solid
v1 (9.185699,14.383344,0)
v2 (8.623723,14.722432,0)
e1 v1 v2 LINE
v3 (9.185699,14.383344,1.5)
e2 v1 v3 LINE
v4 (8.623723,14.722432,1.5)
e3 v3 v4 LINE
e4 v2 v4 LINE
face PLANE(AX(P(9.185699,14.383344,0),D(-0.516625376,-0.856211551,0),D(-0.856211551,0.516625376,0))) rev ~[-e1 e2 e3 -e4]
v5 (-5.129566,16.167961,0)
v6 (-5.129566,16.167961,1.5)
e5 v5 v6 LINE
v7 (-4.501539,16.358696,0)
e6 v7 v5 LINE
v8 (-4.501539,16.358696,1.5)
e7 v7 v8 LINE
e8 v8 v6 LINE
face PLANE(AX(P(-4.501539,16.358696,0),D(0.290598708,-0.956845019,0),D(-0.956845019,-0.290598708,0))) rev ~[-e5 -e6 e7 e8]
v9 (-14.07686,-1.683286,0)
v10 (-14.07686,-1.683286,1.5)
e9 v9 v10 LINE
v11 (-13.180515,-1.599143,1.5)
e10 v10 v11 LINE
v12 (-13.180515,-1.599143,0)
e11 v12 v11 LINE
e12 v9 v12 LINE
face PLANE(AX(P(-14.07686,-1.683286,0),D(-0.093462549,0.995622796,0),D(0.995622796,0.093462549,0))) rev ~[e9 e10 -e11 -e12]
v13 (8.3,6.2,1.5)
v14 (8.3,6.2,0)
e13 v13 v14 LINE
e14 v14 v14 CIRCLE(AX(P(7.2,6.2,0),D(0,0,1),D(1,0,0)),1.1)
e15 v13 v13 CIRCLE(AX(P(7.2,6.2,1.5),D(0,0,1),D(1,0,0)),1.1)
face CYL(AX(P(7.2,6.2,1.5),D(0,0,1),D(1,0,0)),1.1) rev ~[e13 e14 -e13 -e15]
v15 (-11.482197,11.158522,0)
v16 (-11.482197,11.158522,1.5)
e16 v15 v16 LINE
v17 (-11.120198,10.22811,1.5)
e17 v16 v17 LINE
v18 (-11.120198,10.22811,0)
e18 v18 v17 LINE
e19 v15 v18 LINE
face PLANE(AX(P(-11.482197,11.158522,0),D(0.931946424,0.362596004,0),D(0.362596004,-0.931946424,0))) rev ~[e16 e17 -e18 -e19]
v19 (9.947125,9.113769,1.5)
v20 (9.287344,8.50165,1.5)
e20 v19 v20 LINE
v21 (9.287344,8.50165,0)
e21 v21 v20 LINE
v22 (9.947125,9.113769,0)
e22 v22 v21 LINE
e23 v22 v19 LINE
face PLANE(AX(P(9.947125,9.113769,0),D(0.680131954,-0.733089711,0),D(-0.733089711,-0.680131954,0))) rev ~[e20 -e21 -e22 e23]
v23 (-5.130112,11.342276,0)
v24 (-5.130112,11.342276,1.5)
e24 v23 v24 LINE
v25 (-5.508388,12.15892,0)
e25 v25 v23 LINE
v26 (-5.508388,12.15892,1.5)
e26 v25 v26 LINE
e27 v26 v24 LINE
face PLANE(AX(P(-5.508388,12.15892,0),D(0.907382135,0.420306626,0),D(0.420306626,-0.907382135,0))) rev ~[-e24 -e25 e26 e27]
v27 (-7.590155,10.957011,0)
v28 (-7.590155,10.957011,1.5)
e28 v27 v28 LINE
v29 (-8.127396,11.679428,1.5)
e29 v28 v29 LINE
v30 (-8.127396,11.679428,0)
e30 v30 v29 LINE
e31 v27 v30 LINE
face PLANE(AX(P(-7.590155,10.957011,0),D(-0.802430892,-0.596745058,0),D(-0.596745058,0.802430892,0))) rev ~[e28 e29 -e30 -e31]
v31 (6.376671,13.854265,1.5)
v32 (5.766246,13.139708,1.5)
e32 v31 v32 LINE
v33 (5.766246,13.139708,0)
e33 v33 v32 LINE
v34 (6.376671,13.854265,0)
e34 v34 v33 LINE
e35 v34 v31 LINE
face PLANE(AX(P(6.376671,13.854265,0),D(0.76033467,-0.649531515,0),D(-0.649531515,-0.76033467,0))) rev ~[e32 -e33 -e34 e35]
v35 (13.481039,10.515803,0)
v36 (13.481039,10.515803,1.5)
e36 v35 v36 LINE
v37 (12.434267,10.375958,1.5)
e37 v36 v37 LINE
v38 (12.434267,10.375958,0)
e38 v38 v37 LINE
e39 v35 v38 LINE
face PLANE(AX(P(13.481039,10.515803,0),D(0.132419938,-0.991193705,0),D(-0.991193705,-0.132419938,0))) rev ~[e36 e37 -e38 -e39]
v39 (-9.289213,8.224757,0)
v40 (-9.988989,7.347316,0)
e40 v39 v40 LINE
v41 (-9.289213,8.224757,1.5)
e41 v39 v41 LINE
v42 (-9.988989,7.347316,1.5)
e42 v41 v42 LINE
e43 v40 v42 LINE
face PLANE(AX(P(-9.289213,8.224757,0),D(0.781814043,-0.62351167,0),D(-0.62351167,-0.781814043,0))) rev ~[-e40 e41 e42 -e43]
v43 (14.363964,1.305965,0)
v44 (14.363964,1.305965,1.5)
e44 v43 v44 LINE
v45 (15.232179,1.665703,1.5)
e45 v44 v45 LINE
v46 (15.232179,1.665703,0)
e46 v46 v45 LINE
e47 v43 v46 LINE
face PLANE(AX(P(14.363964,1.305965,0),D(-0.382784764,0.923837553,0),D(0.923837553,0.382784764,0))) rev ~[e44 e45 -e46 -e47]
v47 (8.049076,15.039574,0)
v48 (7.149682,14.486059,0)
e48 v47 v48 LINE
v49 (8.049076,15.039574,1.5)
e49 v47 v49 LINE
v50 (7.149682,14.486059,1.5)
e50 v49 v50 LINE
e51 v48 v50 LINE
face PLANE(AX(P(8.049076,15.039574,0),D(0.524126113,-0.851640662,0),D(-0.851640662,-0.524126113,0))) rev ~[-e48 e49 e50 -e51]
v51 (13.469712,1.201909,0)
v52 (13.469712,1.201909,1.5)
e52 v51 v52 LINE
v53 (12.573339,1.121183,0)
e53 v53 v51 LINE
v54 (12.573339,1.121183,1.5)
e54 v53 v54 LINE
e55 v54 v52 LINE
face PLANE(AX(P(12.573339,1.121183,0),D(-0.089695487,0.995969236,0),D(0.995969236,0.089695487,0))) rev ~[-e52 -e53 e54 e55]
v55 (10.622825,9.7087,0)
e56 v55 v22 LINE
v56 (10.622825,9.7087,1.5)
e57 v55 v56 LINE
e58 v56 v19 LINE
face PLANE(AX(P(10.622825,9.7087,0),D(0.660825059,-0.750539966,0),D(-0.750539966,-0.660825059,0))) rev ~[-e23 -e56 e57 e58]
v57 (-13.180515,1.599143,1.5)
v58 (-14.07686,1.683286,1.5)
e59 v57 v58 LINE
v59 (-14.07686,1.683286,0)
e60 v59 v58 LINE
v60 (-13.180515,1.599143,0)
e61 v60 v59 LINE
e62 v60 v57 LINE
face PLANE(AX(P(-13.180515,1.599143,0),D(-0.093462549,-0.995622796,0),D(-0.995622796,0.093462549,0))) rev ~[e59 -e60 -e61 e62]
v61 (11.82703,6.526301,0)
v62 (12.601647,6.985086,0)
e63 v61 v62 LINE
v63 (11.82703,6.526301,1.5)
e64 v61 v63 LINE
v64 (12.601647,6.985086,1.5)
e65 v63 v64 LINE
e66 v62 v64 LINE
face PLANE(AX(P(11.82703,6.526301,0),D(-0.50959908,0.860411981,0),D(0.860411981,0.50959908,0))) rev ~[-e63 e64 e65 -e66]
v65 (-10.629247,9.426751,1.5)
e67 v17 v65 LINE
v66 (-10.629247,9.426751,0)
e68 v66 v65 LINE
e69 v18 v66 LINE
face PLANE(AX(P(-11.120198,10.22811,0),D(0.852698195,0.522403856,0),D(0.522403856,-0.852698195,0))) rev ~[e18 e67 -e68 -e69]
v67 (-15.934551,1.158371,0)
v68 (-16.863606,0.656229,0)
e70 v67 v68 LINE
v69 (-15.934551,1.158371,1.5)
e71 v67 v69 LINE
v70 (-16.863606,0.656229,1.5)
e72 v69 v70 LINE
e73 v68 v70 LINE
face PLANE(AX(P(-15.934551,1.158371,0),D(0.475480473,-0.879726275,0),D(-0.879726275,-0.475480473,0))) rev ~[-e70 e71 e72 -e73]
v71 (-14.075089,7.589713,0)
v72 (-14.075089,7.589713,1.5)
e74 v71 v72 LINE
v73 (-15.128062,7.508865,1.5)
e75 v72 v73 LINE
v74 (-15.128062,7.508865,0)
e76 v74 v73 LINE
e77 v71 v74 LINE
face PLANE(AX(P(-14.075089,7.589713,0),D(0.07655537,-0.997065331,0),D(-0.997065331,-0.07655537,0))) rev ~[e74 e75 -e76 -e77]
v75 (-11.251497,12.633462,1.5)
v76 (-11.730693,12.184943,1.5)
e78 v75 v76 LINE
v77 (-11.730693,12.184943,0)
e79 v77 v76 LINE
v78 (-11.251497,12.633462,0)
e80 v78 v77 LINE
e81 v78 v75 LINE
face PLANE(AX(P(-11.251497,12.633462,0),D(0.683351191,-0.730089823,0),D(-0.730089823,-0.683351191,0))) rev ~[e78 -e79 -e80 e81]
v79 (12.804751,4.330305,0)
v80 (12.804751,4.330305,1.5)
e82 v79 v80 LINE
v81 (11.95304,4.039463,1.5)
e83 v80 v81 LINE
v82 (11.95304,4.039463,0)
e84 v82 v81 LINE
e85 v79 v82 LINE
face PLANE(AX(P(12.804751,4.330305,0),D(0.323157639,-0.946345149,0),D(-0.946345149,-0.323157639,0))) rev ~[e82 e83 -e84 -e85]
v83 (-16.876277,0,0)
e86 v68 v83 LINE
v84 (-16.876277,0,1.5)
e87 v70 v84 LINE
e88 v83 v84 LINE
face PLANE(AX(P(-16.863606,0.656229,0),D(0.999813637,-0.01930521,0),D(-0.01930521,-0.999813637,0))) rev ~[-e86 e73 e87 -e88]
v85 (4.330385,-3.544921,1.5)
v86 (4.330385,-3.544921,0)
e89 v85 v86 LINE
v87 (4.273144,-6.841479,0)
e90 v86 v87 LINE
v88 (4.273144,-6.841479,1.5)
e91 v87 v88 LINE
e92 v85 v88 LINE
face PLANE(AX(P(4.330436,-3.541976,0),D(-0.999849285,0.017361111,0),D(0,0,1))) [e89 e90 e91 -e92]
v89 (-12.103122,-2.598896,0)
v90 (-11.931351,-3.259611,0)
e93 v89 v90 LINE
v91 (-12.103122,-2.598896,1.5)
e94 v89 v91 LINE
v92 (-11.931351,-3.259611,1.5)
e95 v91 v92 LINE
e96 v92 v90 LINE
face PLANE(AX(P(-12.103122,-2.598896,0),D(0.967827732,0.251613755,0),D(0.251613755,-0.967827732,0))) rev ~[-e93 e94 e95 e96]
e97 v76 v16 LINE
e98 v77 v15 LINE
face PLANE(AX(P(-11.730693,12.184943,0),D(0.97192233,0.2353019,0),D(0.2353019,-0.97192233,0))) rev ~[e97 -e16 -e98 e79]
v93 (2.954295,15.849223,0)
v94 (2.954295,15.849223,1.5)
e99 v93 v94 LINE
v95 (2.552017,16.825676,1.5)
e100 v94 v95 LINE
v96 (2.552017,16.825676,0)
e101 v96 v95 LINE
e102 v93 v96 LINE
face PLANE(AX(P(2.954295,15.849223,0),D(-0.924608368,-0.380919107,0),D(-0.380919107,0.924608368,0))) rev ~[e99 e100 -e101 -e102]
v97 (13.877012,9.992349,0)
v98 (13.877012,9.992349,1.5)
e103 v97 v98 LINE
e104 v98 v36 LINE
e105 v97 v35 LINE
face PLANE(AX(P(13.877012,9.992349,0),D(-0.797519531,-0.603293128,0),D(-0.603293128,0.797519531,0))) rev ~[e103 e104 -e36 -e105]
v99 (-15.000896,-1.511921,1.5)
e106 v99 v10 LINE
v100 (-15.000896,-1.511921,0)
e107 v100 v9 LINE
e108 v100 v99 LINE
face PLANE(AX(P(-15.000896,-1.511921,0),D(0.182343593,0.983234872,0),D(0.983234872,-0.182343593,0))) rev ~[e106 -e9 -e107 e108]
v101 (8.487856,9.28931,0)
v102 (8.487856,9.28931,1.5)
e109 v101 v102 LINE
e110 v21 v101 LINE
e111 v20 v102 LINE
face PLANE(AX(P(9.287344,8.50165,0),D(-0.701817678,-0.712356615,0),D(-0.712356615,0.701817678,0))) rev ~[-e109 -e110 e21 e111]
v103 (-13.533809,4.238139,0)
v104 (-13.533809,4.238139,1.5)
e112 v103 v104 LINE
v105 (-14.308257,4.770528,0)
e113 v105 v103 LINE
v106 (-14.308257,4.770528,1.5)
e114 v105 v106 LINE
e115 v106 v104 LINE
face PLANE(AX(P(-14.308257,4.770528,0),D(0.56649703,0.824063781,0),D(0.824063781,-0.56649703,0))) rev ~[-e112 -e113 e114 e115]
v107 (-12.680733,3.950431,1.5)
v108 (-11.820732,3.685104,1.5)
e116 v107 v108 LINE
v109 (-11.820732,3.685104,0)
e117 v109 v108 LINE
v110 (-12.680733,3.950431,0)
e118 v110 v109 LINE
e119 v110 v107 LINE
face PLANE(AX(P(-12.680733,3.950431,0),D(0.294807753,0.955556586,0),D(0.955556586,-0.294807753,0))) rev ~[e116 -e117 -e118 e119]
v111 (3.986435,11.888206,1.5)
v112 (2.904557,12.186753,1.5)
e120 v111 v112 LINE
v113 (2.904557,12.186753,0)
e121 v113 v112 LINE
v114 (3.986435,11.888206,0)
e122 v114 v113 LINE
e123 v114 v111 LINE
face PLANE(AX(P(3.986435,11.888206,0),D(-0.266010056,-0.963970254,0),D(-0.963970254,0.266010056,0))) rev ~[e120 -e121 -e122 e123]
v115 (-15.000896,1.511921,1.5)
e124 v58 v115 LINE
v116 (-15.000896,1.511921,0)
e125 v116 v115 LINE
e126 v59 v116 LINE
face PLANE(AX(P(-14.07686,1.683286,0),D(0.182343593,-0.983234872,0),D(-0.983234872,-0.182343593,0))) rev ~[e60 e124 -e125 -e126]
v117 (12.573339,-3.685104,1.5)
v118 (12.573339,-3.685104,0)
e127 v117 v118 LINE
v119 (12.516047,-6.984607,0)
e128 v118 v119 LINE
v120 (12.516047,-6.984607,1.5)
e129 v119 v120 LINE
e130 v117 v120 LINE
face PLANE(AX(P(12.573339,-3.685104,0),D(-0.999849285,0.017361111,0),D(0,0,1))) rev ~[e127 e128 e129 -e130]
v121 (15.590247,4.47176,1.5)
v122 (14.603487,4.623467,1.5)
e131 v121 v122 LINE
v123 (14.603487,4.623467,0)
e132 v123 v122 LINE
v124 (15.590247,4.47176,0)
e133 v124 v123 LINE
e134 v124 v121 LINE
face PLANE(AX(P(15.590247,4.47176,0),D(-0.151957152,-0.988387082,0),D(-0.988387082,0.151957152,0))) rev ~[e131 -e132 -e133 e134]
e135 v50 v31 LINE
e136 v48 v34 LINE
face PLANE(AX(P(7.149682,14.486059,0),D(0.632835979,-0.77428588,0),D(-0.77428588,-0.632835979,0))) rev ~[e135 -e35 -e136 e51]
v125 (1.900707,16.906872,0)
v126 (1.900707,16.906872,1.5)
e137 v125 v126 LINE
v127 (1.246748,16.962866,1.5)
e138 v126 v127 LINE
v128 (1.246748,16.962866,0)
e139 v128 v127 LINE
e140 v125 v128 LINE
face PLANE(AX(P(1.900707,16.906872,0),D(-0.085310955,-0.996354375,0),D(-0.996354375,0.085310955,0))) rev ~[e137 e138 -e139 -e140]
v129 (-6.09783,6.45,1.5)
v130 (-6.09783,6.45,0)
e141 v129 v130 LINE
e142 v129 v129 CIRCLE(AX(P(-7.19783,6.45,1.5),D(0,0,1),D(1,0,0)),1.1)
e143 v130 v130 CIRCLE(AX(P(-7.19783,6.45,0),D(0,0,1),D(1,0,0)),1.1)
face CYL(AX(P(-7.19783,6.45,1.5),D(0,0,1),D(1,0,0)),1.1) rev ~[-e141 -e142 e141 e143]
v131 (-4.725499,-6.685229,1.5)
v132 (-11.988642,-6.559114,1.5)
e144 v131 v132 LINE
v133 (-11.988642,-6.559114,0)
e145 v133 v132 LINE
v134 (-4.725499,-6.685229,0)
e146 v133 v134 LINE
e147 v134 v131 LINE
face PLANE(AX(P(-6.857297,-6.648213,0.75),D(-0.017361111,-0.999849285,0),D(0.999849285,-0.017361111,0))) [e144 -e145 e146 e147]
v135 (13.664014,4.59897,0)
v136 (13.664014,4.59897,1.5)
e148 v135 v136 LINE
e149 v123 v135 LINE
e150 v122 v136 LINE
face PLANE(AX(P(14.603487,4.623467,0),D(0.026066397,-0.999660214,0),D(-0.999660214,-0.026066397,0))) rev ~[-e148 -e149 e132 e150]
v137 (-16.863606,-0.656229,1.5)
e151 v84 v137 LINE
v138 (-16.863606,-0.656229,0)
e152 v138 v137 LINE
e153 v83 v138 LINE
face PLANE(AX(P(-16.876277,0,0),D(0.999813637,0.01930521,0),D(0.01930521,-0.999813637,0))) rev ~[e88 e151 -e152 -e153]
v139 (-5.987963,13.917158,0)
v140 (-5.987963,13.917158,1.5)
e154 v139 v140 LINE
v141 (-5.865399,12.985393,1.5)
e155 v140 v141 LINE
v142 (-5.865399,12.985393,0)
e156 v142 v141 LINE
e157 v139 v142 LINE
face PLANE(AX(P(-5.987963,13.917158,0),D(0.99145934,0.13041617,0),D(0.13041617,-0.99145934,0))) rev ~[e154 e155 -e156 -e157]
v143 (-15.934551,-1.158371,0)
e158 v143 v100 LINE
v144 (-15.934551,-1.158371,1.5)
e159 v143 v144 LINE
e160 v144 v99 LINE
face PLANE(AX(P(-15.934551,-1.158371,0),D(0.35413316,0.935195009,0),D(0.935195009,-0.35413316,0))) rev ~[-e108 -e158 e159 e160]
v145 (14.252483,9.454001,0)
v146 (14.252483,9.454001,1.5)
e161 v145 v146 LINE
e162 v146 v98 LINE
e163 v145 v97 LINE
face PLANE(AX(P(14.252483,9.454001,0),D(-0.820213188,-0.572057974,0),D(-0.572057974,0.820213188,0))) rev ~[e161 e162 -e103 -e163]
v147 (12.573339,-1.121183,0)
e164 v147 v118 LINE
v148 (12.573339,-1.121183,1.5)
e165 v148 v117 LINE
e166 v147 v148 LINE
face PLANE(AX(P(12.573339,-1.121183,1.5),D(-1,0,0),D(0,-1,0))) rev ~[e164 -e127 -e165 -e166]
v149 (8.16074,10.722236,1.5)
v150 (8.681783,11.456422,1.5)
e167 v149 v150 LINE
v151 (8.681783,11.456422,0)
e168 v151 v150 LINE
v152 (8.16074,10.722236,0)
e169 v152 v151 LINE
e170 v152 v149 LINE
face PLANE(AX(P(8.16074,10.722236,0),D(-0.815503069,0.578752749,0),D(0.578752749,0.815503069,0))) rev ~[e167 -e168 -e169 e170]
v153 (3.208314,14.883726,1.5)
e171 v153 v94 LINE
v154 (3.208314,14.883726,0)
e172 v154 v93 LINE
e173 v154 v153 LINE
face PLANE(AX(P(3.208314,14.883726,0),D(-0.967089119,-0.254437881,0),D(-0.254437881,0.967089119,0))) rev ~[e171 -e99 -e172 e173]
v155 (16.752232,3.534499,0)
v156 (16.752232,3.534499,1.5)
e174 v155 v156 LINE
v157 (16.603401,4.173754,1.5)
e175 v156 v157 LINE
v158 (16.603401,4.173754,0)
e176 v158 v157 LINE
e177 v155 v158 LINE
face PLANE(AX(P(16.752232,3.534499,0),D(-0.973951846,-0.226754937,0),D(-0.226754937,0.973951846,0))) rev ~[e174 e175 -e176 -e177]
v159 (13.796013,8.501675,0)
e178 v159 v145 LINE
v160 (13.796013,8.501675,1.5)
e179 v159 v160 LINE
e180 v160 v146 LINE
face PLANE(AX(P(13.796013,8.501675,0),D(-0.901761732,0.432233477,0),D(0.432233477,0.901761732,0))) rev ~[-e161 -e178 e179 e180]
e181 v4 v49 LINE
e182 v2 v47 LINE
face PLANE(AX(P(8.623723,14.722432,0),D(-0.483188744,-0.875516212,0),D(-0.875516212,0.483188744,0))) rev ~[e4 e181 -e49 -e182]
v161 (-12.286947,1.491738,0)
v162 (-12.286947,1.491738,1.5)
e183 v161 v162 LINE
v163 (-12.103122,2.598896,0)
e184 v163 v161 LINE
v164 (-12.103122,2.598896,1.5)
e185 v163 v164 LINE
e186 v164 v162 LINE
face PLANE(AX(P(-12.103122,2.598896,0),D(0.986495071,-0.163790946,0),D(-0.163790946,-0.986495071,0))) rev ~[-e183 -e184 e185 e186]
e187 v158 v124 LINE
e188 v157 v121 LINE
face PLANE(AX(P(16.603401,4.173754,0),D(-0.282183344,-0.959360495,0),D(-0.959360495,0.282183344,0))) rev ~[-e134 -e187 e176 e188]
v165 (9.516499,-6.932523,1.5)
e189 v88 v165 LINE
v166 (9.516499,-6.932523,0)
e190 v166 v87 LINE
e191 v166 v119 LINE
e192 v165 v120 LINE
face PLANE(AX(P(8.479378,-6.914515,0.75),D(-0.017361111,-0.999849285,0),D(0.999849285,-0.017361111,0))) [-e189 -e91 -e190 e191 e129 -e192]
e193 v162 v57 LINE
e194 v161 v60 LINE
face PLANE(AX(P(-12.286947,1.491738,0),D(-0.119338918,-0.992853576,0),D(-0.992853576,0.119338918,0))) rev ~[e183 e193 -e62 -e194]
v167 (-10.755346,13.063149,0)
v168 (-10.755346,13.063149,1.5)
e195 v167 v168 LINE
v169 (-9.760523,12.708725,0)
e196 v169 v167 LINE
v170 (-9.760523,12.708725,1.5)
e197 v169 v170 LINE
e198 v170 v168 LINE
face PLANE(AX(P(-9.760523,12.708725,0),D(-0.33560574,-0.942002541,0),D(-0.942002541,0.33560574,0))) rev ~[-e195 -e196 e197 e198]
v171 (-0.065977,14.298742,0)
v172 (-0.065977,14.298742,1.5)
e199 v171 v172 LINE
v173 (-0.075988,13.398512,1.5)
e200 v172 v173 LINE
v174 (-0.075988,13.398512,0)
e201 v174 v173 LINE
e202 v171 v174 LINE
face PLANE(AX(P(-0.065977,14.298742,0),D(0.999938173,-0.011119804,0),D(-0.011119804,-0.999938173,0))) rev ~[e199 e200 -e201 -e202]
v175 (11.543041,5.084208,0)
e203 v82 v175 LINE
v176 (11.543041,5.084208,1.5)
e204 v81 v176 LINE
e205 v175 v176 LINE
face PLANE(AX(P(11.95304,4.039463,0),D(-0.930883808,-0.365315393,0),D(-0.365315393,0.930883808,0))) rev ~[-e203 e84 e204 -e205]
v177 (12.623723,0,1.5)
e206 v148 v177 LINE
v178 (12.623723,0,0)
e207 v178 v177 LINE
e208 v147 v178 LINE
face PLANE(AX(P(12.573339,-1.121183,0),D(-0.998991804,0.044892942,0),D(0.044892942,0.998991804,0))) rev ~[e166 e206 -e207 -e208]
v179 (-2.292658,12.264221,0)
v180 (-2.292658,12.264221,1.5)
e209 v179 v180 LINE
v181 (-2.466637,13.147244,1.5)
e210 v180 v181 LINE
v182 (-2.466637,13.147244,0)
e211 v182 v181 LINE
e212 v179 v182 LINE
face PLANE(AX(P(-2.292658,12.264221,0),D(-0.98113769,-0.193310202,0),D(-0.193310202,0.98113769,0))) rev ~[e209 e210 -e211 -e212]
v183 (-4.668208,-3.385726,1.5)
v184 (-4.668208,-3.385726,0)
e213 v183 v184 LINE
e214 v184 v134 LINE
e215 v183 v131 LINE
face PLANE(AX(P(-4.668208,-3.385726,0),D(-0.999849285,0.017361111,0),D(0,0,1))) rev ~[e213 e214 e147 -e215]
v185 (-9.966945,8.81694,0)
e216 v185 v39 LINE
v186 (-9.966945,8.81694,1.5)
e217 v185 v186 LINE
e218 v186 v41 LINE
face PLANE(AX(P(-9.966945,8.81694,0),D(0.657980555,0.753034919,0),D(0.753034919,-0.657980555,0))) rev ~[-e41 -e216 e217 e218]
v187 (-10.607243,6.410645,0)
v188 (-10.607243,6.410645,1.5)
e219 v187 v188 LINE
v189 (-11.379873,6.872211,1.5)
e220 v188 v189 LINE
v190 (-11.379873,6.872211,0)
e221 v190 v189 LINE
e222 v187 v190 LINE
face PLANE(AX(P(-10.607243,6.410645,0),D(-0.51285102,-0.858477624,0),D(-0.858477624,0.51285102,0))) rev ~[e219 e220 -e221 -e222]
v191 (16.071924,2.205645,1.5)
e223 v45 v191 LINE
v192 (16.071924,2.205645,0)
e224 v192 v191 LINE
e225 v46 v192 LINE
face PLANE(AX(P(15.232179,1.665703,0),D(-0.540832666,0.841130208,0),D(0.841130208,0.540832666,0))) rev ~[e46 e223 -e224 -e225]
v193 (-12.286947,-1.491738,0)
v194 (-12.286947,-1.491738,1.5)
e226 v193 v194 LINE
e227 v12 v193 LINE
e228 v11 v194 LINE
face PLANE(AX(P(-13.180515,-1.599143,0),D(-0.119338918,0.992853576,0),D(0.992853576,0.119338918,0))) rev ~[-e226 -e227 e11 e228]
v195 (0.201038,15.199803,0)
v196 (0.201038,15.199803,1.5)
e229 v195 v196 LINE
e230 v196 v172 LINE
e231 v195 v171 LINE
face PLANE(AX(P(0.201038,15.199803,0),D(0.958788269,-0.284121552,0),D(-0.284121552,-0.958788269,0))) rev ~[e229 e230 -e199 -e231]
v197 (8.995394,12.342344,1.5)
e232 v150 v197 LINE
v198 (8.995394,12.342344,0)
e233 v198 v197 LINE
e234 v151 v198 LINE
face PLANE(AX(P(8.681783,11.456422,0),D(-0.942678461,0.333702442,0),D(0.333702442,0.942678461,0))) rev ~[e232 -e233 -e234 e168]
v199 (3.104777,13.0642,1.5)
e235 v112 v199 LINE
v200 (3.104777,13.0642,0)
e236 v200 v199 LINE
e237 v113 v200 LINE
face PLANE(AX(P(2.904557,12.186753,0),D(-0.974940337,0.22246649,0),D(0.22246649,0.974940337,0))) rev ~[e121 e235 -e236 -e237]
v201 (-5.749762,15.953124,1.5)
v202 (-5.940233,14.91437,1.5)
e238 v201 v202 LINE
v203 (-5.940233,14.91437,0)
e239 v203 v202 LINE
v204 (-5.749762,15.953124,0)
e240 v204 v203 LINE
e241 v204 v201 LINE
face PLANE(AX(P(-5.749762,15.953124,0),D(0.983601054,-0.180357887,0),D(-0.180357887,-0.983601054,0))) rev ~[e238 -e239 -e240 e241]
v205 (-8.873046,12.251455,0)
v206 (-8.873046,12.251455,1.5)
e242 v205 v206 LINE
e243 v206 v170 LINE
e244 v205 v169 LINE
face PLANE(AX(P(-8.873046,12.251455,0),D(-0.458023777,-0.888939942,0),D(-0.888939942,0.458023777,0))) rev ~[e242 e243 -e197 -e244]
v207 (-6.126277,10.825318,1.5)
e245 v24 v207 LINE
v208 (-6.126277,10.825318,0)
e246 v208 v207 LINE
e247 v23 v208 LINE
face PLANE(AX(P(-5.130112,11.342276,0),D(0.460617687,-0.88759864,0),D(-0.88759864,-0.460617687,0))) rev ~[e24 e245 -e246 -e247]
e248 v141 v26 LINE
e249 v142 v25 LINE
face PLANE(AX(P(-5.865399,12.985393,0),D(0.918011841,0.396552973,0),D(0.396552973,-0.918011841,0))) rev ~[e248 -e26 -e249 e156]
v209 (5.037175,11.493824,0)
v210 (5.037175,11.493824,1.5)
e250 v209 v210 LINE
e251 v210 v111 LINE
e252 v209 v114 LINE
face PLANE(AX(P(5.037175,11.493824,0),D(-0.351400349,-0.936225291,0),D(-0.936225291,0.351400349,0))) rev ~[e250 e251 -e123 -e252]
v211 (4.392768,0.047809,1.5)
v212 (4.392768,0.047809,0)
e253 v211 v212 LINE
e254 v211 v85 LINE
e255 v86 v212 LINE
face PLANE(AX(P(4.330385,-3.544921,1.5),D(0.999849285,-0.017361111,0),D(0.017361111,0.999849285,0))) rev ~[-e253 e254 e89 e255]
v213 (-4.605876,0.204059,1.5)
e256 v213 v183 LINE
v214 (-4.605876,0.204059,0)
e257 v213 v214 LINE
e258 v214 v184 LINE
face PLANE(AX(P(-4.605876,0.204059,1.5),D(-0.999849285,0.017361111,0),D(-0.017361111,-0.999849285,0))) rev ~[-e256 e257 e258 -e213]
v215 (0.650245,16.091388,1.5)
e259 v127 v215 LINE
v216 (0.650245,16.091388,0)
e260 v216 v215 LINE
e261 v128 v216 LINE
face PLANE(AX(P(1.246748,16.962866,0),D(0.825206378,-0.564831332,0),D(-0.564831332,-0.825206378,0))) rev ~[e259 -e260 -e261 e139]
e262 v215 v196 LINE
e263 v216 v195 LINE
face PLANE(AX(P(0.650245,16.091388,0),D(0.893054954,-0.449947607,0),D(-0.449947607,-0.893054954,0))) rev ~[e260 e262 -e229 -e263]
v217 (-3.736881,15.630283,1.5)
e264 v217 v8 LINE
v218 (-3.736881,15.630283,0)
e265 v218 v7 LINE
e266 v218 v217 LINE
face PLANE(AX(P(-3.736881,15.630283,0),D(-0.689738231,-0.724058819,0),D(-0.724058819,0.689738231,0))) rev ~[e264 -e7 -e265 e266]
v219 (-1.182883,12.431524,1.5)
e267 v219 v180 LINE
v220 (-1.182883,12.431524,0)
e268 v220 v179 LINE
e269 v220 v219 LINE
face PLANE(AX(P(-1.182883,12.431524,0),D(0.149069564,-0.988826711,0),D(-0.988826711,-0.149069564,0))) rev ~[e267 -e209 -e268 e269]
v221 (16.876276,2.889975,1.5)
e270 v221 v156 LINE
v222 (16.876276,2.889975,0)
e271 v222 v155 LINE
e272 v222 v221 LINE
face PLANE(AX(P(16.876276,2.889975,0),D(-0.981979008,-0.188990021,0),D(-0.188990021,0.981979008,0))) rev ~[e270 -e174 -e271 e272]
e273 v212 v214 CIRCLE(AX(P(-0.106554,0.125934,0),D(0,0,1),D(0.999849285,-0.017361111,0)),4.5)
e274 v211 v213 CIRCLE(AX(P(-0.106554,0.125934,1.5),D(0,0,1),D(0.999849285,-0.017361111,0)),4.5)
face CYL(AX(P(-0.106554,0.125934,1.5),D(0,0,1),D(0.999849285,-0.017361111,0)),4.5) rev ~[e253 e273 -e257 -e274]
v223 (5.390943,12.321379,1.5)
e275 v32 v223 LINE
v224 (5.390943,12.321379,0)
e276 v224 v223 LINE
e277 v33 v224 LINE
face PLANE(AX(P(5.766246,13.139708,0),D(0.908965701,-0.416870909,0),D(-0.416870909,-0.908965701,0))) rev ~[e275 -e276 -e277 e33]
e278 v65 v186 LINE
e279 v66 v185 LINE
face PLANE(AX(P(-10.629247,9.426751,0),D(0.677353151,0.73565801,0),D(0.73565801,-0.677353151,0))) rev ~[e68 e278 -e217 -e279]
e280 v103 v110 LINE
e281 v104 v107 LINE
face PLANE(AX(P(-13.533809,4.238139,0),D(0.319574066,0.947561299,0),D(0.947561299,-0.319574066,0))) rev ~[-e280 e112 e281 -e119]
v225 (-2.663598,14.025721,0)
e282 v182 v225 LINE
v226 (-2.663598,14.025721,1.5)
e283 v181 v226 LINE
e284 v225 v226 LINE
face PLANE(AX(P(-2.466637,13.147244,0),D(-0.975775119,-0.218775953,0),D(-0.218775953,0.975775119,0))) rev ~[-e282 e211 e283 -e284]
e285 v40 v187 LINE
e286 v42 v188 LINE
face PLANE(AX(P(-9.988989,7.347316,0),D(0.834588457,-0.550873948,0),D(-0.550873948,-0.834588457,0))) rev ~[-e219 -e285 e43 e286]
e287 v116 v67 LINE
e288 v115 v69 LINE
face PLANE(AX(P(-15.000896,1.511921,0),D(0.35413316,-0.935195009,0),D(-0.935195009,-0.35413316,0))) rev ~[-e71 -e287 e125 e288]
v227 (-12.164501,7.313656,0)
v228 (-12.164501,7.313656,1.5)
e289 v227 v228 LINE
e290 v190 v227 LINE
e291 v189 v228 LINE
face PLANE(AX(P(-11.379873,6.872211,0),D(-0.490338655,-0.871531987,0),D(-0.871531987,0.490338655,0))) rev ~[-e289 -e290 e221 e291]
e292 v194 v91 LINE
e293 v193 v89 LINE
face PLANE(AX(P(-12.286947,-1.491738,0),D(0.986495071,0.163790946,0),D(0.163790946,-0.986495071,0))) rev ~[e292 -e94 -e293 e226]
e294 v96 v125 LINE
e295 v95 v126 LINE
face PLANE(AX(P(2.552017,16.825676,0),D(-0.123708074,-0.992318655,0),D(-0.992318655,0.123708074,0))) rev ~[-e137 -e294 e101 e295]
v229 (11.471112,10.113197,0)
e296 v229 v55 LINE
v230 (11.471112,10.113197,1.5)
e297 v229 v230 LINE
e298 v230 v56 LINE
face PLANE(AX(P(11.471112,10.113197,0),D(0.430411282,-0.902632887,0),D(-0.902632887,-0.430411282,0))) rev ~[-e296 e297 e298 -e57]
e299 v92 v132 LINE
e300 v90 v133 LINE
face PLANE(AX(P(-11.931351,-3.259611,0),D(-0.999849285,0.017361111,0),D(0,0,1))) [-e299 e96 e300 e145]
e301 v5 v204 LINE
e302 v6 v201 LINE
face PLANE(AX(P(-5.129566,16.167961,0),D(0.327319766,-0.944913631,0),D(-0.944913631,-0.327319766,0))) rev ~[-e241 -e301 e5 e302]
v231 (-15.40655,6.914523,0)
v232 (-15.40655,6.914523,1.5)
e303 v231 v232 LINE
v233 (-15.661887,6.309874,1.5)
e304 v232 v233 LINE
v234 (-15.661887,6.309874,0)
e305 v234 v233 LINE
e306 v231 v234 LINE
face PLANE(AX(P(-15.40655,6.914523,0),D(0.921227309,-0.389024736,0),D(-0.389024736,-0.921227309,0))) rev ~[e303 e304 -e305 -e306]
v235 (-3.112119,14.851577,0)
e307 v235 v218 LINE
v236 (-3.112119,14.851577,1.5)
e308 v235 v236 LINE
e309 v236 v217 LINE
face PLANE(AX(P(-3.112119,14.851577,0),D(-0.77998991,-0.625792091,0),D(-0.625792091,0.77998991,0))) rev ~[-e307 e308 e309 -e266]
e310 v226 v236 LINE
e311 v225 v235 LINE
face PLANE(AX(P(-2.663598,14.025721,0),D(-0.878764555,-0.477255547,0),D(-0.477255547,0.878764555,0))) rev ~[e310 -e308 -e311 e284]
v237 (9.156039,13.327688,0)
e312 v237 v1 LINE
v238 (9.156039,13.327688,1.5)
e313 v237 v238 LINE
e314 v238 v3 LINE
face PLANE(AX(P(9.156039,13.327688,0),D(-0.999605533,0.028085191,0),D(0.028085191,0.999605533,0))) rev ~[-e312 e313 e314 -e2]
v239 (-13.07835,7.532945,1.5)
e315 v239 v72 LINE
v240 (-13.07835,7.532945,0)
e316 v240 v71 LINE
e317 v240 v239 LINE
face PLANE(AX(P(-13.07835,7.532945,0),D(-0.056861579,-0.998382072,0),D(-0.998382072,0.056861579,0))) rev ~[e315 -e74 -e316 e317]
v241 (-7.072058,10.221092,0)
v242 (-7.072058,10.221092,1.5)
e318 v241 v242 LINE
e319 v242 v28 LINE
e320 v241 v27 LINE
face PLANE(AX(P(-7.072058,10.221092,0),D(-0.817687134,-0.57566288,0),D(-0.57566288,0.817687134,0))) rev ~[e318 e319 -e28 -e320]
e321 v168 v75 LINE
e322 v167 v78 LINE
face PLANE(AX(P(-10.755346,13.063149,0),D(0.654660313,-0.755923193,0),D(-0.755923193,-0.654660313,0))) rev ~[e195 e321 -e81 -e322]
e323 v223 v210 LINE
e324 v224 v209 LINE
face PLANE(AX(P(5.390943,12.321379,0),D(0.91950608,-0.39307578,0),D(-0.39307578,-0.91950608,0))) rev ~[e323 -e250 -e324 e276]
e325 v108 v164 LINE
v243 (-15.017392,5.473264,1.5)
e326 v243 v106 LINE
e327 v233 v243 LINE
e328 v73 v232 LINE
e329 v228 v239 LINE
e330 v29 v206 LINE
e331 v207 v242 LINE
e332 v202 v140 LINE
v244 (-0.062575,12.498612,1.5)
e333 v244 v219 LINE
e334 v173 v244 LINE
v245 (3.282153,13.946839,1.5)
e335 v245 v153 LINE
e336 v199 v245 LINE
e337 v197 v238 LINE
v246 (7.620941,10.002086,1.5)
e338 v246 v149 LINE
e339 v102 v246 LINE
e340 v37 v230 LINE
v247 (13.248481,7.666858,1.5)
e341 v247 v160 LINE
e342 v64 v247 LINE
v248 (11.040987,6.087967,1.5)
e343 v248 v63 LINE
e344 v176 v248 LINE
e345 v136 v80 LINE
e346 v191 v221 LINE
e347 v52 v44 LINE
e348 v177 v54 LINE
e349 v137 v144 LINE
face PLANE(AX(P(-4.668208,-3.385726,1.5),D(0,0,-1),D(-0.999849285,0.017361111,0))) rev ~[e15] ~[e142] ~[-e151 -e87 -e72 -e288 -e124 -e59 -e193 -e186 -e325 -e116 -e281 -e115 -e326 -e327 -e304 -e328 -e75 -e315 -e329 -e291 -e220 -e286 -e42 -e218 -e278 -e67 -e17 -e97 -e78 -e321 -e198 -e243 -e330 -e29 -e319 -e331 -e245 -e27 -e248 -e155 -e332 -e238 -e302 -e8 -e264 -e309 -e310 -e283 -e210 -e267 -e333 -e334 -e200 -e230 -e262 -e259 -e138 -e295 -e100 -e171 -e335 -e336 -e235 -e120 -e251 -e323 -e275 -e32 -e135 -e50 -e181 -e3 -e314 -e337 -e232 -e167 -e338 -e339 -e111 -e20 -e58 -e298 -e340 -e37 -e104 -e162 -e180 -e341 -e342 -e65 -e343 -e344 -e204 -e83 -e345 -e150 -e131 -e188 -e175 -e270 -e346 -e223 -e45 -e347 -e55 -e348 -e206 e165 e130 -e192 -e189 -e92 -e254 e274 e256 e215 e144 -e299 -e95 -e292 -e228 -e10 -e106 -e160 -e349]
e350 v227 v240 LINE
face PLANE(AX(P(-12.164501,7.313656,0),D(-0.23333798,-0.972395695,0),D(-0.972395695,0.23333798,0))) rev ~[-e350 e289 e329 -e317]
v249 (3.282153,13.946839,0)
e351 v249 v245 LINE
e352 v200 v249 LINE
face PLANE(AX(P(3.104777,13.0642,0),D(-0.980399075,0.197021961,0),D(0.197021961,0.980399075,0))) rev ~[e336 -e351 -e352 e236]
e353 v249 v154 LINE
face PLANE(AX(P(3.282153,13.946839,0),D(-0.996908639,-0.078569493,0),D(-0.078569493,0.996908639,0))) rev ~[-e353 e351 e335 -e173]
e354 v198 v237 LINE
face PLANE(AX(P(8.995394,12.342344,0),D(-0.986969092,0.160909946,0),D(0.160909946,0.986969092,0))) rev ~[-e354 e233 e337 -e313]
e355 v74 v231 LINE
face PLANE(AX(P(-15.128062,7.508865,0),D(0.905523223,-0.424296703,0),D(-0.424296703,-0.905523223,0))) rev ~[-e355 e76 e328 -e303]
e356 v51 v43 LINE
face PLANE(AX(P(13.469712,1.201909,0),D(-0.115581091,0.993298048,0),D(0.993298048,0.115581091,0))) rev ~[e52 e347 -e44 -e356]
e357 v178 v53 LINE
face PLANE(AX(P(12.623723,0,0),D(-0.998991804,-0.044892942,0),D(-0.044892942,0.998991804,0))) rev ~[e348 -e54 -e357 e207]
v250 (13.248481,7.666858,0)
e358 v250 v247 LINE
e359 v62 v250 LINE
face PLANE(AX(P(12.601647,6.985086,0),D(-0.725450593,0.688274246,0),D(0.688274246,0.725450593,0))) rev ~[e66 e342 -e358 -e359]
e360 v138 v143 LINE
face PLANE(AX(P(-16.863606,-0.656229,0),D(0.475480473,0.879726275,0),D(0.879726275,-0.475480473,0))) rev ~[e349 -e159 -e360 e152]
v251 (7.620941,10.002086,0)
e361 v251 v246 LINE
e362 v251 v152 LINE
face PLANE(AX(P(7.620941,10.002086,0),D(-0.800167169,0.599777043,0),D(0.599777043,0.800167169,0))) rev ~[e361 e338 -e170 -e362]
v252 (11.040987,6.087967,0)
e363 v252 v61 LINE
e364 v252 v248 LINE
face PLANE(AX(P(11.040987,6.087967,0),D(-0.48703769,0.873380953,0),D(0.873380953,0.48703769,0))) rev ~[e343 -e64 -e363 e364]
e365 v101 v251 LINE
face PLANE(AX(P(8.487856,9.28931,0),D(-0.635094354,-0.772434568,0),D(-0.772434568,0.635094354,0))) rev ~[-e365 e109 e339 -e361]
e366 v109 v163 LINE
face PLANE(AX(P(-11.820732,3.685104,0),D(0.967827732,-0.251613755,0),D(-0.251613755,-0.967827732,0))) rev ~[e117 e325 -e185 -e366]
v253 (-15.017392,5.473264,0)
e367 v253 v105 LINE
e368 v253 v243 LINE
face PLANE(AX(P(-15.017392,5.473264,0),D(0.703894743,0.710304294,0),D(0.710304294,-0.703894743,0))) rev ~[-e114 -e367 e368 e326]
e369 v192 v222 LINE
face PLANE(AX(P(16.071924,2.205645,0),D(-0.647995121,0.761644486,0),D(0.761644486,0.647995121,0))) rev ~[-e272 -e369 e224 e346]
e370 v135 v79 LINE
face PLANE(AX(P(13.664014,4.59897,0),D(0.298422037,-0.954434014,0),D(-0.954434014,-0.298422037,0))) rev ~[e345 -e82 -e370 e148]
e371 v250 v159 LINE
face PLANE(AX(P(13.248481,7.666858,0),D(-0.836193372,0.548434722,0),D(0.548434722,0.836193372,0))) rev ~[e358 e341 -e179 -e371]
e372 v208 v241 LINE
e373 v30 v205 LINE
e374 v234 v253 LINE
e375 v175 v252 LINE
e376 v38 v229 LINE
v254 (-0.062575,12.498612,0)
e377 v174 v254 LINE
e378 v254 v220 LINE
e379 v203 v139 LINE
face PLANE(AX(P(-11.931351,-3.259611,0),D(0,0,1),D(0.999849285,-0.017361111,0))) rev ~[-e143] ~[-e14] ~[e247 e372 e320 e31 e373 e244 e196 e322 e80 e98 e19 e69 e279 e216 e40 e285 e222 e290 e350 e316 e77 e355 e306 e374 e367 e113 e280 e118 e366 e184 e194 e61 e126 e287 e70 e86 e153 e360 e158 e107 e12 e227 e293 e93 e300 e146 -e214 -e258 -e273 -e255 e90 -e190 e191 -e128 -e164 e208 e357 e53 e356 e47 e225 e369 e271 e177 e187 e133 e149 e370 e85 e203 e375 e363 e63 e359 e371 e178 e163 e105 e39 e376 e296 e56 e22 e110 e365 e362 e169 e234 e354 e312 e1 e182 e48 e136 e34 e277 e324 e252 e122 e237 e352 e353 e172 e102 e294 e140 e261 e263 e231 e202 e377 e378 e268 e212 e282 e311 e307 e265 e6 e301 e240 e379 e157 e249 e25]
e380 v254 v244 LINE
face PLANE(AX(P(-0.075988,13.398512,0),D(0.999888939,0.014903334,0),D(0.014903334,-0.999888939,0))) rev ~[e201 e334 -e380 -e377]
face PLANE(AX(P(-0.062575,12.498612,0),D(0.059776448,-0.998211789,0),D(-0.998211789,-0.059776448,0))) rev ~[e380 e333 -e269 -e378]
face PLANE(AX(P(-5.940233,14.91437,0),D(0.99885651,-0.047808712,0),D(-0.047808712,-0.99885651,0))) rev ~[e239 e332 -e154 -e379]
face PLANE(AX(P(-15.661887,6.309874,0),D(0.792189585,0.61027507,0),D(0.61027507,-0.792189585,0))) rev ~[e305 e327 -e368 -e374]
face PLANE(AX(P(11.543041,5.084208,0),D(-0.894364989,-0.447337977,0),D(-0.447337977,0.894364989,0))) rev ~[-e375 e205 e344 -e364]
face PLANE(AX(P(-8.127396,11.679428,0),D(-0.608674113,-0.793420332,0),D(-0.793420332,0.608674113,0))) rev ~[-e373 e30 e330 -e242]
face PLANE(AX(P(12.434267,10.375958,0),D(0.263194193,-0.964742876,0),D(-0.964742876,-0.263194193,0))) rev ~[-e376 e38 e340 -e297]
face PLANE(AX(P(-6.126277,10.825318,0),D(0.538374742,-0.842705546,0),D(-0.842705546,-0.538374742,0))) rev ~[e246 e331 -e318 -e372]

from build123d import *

# Parameters (mm, degrees)
F1_DEPTH  = 1.5
F2_R      = 1.1
F3_DEPTH  = 1.5
F4_W      = 4.2642379355
F4_H      = 1.5
F4_W_2    = 3
F4_W_3    = 5.2441455437
F3_FACE_W = 8.0745559603
F3_FACE_H = 1.5
F5_DEPTH  = 3.3


with BuildPart() as f1:
    # F0 (on Top) → F1 (new body)
    with BuildSketch(Plane.XY):
        Polygon((12.573339, -1.121183), (12.623723, 0), (12.573339, 1.121183), (13.469712, 1.201909), (14.363964, 1.305965), (15.232179, 1.665703), (16.071924, 2.205645), (16.876276, 2.889975), (16.752232, 3.534499), (16.603401, 4.173754), (15.590247, 4.47176), (14.603487, 4.623467), (13.664014, 4.59897), (12.804751, 4.330305), (11.95304, 4.039463), (11.543041, 5.084208), (11.040987, 6.087967), (11.82703, 6.526301), (12.601647, 6.985086), (13.248481, 7.666858), (13.796013, 8.501675), (14.252483, 9.454001), (13.877012, 9.992349), (13.481039, 10.515803), (12.434267, 10.375958), (11.471112, 10.113197), (10.622825, 9.7087), (9.947125, 9.113769), (9.287344, 8.50165), (8.487856, 9.28931), (7.620941, 10.002086), (8.16074, 10.722236), (8.681783, 11.456422), (8.995394, 12.342344), (9.156039, 13.327688), (9.185699, 14.383344), (8.623723, 14.722432), (8.049076, 15.039574), (7.149682, 14.486059), (6.376671, 13.854265), (5.766246, 13.139708), (5.390943, 12.321379), (5.037175, 11.493824), (3.986435, 11.888206), (2.904557, 12.186753), (3.104777, 13.0642), (3.282153, 13.946839), (3.208314, 14.883726), (2.954295, 15.849223), (2.552017, 16.825676), (1.900707, 16.906872), (1.246748, 16.962866), (0.650245, 16.091388), (0.201038, 15.199803), (-0.065977, 14.298742), (-0.075988, 13.398512), (-0.062575, 12.498612), (-1.182883, 12.431524), (-2.292658, 12.264221), (-2.466637, 13.147244), (-2.663598, 14.025721), (-3.112119, 14.851577), (-3.736881, 15.630283), (-4.501539, 16.358696), (-5.129566, 16.167961), (-5.749762, 15.953124), (-5.940233, 14.91437), (-5.987963, 13.917158), (-5.865399, 12.985393), (-5.508388, 12.15892), (-5.130112, 11.342276), (-6.126277, 10.825318), (-7.072058, 10.221092), (-7.590155, 10.957011), (-8.127396, 11.679428), (-8.873046, 12.251455), (-9.760523, 12.708725), (-10.755346, 13.063149), (-11.251497, 12.633462), (-11.730693, 12.184943), (-11.482197, 11.158522), (-11.120198, 10.22811), (-10.629247, 9.426751), (-9.966945, 8.81694), (-9.289213, 8.224757), (-9.988989, 7.347316), (-10.607243, 6.410645), (-11.379873, 6.872211), (-12.164501, 7.313656), (-13.07835, 7.532945), (-14.075089, 7.589713), (-15.128062, 7.508865), (-15.40655, 6.914523), (-15.661887, 6.309874), (-15.017392, 5.473264), (-14.308257, 4.770528), (-13.533809, 4.238139), (-12.680733, 3.950431), (-11.820732, 3.685104), (-12.103122, 2.598896), (-12.286947, 1.491738), (-13.180515, 1.599143), (-14.07686, 1.683286), (-15.000896, 1.511921), (-15.934551, 1.158371), (-16.863606, 0.656229), (-16.876277, 0), (-16.863606, -0.656229), (-15.934551, -1.158371), (-15.000896, -1.511921), (-14.07686, -1.683286), (-13.180515, -1.599143), (-12.286947, -1.491738), (-12.103122, -2.598896), (-11.820732, -3.685104), (-12.680733, -3.950431), (-13.533809, -4.238139), (-14.308257, -4.770528), (-15.017392, -5.473264), (-15.661887, -6.309874), (-15.40655, -6.914523), (-15.128062, -7.508865), (-14.075089, -7.589713), (-13.07835, -7.532945), (-12.164501, -7.313656), (-11.379873, -6.872211), (-10.607243, -6.410645), (-9.988989, -7.347316), (-9.289213, -8.224757), (-9.966945, -8.81694), (-10.629247, -9.426751), (-11.120198, -10.22811), (-11.482197, -11.158522), (-11.730693, -12.184943), (-11.251497, -12.633462), (-10.755346, -13.063149), (-9.760523, -12.708725), (-8.873046, -12.251455), (-8.127396, -11.679428), (-7.590155, -10.957011), (-7.072058, -10.221092), (-6.126277, -10.825318), (-5.130112, -11.342276), (-5.508388, -12.15892), (-5.865399, -12.985393), (-5.987963, -13.917158), (-5.940233, -14.91437), (-5.749762, -15.953124), (-5.129566, -16.167961), (-4.501539, -16.358696), (-3.736881, -15.630283), (-3.112119, -14.851577), (-2.663598, -14.025721), (-2.466637, -13.147244), (-2.292658, -12.264221), (-1.182883, -12.431524), (-0.062575, -12.498612), (-0.075988, -13.398512), (-0.065977, -14.298742), (0.201038, -15.199803), (0.650245, -16.091388), (1.246748, -16.962866), (1.900707, -16.906872), (2.552017, -16.825676), (2.954295, -15.849223), (3.208314, -14.883726), (3.282153, -13.946839), (3.104777, -13.0642), (2.904557, -12.186753), (3.986435, -11.888206), (5.037175, -11.493824), (5.390943, -12.321379), (5.766246, -13.139708), (6.376671, -13.854265), (7.149682, -14.486059), (8.049076, -15.039574), (8.623723, -14.722432), (9.185699, -14.383344), (9.156039, -13.327688), (8.995394, -12.342344), (8.681783, -11.456422), (8.16074, -10.722236), (7.620941, -10.002086), (8.487856, -9.28931), (9.287344, -8.50165), (9.947125, -9.113769), (10.622825, -9.7087), (11.471112, -10.113197), (12.434267, -10.375958), (13.481039, -10.515803), (13.877012, -9.992349), (14.252483, -9.454001), (13.796013, -8.501675), (13.248481, -7.666858), (12.601647, -6.985086), (11.82703, -6.526301), (11.040987, -6.087967), (11.543041, -5.084208), (11.95304, -4.039463), (12.804751, -4.330305), (13.664014, -4.59897), (14.603487, -4.623467), (15.590247, -4.47176), (16.603401, -4.173754), (16.752232, -3.534499), (16.876276, -2.889975), (16.071924, -2.205645), (15.232179, -1.665703), (14.363964, -1.305965), (13.469712, -1.201909), align=None)
    extrude(amount=F1_DEPTH)

    # F2 (on face) → F3 (cut, through all)
    with BuildSketch(Plane.XY.offset(1.5)):
        with Locations((-7.1978296976, 6.45)):
            Circle(F2_R)
        with Locations((7.2, 6.2)):
            Circle(F2_R)
        with BuildLine():
            Line((13.469712, -1.201909), (12.573339, -1.121183))
            Line((12.573339, -1.121183), (12.573339, -3.685104))
            Line((12.573339, -3.685104), (4.5, -3.5449207368))
            Line((4.5, -3.5449207368), (4.330384853, -3.5449207368))
            Line((4.330384853, -3.5449207368), (4.3927680428, 0.0478094358))
            ThreePointArc((4.3927680428, 0.0478094358), (-0.0284287377, 4.6252562163), (-4.6058755182, 0.2040594358))
            Line((-4.6058755182, 0.2040594358), (-4.6682075846, -3.3857264732))
            Line((-4.6682075846, -3.3857264732), (-11.9313506872, -3.2596112313))
            Line((-11.9313506872, -3.2596112313), (-11.820732, -3.685104))
            Line((-11.820732, -3.685104), (-12.680733, -3.950431))
            Line((-12.680733, -3.950431), (-13.533809, -4.238139))
            Line((-13.533809, -4.238139), (-14.308257, -4.770528))
            Line((-14.308257, -4.770528), (-15.017392, -5.473264))
            Line((-15.017392, -5.473264), (-15.661887, -6.309874))
            Line((-15.661887, -6.309874), (-15.40655, -6.914523))
            Line((-15.40655, -6.914523), (-15.128062, -7.508865))
            Line((-15.128062, -7.508865), (-14.075089, -7.589713))
            Line((-14.075089, -7.589713), (-13.07835, -7.532945))
            Line((-13.07835, -7.532945), (-12.164501, -7.313656))
            Line((-12.164501, -7.313656), (-11.379873, -6.872211))
            Line((-11.379873, -6.872211), (-10.607243, -6.410645))
            Line((-10.607243, -6.410645), (-9.988989, -7.347316))
            Line((-9.988989, -7.347316), (-9.289213, -8.224757))
            Line((-9.289213, -8.224757), (-9.966945, -8.81694))
            Line((-9.966945, -8.81694), (-10.629247, -9.426751))
            Line((-10.629247, -9.426751), (-11.120198, -10.22811))
            Line((-11.120198, -10.22811), (-11.482197, -11.158522))
            Line((-11.482197, -11.158522), (-11.730693, -12.184943))
            Line((-11.730693, -12.184943), (-11.251497, -12.633462))
            Line((-11.251497, -12.633462), (-10.755346, -13.063149))
            Line((-10.755346, -13.063149), (-9.760523, -12.708725))
            Line((-9.760523, -12.708725), (-8.873046, -12.251455))
            Line((-8.873046, -12.251455), (-8.127396, -11.679428))
            Line((-8.127396, -11.679428), (-7.590155, -10.957011))
            Line((-7.590155, -10.957011), (-7.072058, -10.221092))
            Line((-7.072058, -10.221092), (-6.126277, -10.825318))
            Line((-6.126277, -10.825318), (-5.130112, -11.342276))
            Line((-5.130112, -11.342276), (-5.508388, -12.15892))
            Line((-5.508388, -12.15892), (-5.865399, -12.985393))
            Line((-5.865399, -12.985393), (-5.987963, -13.917158))
            Line((-5.987963, -13.917158), (-5.940233, -14.91437))
            Line((-5.940233, -14.91437), (-5.749762, -15.953124))
            Line((-5.749762, -15.953124), (-5.129566, -16.167961))
            Line((-5.129566, -16.167961), (-4.501539, -16.358696))
            Line((-4.501539, -16.358696), (-3.736881, -15.630283))
            Line((-3.736881, -15.630283), (-3.112119, -14.851577))
            Line((-3.112119, -14.851577), (-2.663598, -14.025721))
            Line((-2.663598, -14.025721), (-2.466637, -13.147244))
            Line((-2.466637, -13.147244), (-2.292658, -12.264221))
            Line((-2.292658, -12.264221), (-1.182883, -12.431524))
            Line((-1.182883, -12.431524), (-0.062575, -12.498612))
            Line((-0.062575, -12.498612), (-0.075988, -13.398512))
            Line((-0.075988, -13.398512), (-0.065977, -14.298742))
            Line((-0.065977, -14.298742), (0.201038, -15.199803))
            Line((0.201038, -15.199803), (0.650245, -16.091388))
            Line((0.650245, -16.091388), (1.246748, -16.962866))
            Line((1.246748, -16.962866), (1.900707, -16.906872))
            Line((1.900707, -16.906872), (2.552017, -16.825676))
            Line((2.552017, -16.825676), (2.954295, -15.849223))
            Line((2.954295, -15.849223), (3.208314, -14.883726))
            Line((3.208314, -14.883726), (3.282153, -13.946839))
            Line((3.282153, -13.946839), (3.104777, -13.0642))
            Line((3.104777, -13.0642), (2.904557, -12.186753))
            Line((2.904557, -12.186753), (3.986435, -11.888206))
            Line((3.986435, -11.888206), (5.037175, -11.493824))
            Line((5.037175, -11.493824), (5.390943, -12.321379))
            Line((5.390943, -12.321379), (5.766246, -13.139708))
            Line((5.766246, -13.139708), (6.376671, -13.854265))
            Line((6.376671, -13.854265), (7.149682, -14.486059))
            Line((7.149682, -14.486059), (8.049076, -15.039574))
            Line((8.049076, -15.039574), (8.623723, -14.722432))
            Line((8.623723, -14.722432), (9.185699, -14.383344))
            Line((9.185699, -14.383344), (9.156039, -13.327688))
            Line((9.156039, -13.327688), (8.995394, -12.342344))
            Line((8.995394, -12.342344), (8.681783, -11.456422))
            Line((8.681783, -11.456422), (8.16074, -10.722236))
            Line((8.16074, -10.722236), (7.620941, -10.002086))
            Line((7.620941, -10.002086), (8.487856, -9.28931))
            Line((8.487856, -9.28931), (9.287344, -8.50165))
            Line((9.287344, -8.50165), (9.947125, -9.113769))
            Line((9.947125, -9.113769), (10.622825, -9.7087))
            Line((10.622825, -9.7087), (11.471112, -10.113197))
            Line((11.471112, -10.113197), (12.434267, -10.375958))
            Line((12.434267, -10.375958), (13.481039, -10.515803))
            Line((13.481039, -10.515803), (13.877012, -9.992349))
            Line((13.877012, -9.992349), (14.252483, -9.454001))
            Line((14.252483, -9.454001), (13.796013, -8.501675))
            Line((13.796013, -8.501675), (13.248481, -7.666858))
            Line((13.248481, -7.666858), (12.601647, -6.985086))
            Line((12.601647, -6.985086), (11.82703, -6.526301))
            Line((11.82703, -6.526301), (11.040987, -6.087967))
            Line((11.040987, -6.087967), (11.543041, -5.084208))
            Line((11.543041, -5.084208), (11.95304, -4.039463))
            Line((11.95304, -4.039463), (12.804751, -4.330305))
            Line((12.804751, -4.330305), (13.664014, -4.59897))
            Line((13.664014, -4.59897), (14.603487, -4.623467))
            Line((14.603487, -4.623467), (15.590247, -4.47176))
            Line((15.590247, -4.47176), (16.603401, -4.173754))
            Line((16.603401, -4.173754), (16.752232, -3.534499))
            Line((16.752232, -3.534499), (16.876276, -2.889975))
            Line((16.876276, -2.889975), (16.071924, -2.205645))
            Line((16.071924, -2.205645), (15.232179, -1.665703))
            Line((15.232179, -1.665703), (14.363964, -1.305965))
            Line((14.363964, -1.305965), (13.469712, -1.201909))
        make_face()
    extrude(amount=-F3_DEPTH, mode=Mode.SUBTRACT)

    # F4 (on face) + F3_face (on face) → F5 (join)
    with BuildSketch(Plane(origin=(-0.0601781504, -3.4657390433, 0), x_dir=(0.9998492846, -0.0173611111, 0), z_dir=(-0.0173611111, -0.9998492846, 0))):
        with Locations((-6.7408430078, 0.75)):
            Rectangle(F4_W, F4_H)
        with Locations((-10.3729619756, 0.75)):
            Rectangle(F4_W_2, F4_H)
        with Locations((7.0133487317, 0.75)):
            Rectangle(F4_W_3, F4_H)
    with BuildSketch(Plane(origin=(-8.2997791359, -3.3226688522, 0.75), x_dir=(0.9998492846, -0.0173611111, 0), z_dir=(-0.0173611111, -0.9998492846, 0))):
        with Locations((16.8389865313, 0)):
            Rectangle(F3_FACE_W, F3_FACE_H)
    extrude(amount=F5_DEPTH)


solid = f1.part
